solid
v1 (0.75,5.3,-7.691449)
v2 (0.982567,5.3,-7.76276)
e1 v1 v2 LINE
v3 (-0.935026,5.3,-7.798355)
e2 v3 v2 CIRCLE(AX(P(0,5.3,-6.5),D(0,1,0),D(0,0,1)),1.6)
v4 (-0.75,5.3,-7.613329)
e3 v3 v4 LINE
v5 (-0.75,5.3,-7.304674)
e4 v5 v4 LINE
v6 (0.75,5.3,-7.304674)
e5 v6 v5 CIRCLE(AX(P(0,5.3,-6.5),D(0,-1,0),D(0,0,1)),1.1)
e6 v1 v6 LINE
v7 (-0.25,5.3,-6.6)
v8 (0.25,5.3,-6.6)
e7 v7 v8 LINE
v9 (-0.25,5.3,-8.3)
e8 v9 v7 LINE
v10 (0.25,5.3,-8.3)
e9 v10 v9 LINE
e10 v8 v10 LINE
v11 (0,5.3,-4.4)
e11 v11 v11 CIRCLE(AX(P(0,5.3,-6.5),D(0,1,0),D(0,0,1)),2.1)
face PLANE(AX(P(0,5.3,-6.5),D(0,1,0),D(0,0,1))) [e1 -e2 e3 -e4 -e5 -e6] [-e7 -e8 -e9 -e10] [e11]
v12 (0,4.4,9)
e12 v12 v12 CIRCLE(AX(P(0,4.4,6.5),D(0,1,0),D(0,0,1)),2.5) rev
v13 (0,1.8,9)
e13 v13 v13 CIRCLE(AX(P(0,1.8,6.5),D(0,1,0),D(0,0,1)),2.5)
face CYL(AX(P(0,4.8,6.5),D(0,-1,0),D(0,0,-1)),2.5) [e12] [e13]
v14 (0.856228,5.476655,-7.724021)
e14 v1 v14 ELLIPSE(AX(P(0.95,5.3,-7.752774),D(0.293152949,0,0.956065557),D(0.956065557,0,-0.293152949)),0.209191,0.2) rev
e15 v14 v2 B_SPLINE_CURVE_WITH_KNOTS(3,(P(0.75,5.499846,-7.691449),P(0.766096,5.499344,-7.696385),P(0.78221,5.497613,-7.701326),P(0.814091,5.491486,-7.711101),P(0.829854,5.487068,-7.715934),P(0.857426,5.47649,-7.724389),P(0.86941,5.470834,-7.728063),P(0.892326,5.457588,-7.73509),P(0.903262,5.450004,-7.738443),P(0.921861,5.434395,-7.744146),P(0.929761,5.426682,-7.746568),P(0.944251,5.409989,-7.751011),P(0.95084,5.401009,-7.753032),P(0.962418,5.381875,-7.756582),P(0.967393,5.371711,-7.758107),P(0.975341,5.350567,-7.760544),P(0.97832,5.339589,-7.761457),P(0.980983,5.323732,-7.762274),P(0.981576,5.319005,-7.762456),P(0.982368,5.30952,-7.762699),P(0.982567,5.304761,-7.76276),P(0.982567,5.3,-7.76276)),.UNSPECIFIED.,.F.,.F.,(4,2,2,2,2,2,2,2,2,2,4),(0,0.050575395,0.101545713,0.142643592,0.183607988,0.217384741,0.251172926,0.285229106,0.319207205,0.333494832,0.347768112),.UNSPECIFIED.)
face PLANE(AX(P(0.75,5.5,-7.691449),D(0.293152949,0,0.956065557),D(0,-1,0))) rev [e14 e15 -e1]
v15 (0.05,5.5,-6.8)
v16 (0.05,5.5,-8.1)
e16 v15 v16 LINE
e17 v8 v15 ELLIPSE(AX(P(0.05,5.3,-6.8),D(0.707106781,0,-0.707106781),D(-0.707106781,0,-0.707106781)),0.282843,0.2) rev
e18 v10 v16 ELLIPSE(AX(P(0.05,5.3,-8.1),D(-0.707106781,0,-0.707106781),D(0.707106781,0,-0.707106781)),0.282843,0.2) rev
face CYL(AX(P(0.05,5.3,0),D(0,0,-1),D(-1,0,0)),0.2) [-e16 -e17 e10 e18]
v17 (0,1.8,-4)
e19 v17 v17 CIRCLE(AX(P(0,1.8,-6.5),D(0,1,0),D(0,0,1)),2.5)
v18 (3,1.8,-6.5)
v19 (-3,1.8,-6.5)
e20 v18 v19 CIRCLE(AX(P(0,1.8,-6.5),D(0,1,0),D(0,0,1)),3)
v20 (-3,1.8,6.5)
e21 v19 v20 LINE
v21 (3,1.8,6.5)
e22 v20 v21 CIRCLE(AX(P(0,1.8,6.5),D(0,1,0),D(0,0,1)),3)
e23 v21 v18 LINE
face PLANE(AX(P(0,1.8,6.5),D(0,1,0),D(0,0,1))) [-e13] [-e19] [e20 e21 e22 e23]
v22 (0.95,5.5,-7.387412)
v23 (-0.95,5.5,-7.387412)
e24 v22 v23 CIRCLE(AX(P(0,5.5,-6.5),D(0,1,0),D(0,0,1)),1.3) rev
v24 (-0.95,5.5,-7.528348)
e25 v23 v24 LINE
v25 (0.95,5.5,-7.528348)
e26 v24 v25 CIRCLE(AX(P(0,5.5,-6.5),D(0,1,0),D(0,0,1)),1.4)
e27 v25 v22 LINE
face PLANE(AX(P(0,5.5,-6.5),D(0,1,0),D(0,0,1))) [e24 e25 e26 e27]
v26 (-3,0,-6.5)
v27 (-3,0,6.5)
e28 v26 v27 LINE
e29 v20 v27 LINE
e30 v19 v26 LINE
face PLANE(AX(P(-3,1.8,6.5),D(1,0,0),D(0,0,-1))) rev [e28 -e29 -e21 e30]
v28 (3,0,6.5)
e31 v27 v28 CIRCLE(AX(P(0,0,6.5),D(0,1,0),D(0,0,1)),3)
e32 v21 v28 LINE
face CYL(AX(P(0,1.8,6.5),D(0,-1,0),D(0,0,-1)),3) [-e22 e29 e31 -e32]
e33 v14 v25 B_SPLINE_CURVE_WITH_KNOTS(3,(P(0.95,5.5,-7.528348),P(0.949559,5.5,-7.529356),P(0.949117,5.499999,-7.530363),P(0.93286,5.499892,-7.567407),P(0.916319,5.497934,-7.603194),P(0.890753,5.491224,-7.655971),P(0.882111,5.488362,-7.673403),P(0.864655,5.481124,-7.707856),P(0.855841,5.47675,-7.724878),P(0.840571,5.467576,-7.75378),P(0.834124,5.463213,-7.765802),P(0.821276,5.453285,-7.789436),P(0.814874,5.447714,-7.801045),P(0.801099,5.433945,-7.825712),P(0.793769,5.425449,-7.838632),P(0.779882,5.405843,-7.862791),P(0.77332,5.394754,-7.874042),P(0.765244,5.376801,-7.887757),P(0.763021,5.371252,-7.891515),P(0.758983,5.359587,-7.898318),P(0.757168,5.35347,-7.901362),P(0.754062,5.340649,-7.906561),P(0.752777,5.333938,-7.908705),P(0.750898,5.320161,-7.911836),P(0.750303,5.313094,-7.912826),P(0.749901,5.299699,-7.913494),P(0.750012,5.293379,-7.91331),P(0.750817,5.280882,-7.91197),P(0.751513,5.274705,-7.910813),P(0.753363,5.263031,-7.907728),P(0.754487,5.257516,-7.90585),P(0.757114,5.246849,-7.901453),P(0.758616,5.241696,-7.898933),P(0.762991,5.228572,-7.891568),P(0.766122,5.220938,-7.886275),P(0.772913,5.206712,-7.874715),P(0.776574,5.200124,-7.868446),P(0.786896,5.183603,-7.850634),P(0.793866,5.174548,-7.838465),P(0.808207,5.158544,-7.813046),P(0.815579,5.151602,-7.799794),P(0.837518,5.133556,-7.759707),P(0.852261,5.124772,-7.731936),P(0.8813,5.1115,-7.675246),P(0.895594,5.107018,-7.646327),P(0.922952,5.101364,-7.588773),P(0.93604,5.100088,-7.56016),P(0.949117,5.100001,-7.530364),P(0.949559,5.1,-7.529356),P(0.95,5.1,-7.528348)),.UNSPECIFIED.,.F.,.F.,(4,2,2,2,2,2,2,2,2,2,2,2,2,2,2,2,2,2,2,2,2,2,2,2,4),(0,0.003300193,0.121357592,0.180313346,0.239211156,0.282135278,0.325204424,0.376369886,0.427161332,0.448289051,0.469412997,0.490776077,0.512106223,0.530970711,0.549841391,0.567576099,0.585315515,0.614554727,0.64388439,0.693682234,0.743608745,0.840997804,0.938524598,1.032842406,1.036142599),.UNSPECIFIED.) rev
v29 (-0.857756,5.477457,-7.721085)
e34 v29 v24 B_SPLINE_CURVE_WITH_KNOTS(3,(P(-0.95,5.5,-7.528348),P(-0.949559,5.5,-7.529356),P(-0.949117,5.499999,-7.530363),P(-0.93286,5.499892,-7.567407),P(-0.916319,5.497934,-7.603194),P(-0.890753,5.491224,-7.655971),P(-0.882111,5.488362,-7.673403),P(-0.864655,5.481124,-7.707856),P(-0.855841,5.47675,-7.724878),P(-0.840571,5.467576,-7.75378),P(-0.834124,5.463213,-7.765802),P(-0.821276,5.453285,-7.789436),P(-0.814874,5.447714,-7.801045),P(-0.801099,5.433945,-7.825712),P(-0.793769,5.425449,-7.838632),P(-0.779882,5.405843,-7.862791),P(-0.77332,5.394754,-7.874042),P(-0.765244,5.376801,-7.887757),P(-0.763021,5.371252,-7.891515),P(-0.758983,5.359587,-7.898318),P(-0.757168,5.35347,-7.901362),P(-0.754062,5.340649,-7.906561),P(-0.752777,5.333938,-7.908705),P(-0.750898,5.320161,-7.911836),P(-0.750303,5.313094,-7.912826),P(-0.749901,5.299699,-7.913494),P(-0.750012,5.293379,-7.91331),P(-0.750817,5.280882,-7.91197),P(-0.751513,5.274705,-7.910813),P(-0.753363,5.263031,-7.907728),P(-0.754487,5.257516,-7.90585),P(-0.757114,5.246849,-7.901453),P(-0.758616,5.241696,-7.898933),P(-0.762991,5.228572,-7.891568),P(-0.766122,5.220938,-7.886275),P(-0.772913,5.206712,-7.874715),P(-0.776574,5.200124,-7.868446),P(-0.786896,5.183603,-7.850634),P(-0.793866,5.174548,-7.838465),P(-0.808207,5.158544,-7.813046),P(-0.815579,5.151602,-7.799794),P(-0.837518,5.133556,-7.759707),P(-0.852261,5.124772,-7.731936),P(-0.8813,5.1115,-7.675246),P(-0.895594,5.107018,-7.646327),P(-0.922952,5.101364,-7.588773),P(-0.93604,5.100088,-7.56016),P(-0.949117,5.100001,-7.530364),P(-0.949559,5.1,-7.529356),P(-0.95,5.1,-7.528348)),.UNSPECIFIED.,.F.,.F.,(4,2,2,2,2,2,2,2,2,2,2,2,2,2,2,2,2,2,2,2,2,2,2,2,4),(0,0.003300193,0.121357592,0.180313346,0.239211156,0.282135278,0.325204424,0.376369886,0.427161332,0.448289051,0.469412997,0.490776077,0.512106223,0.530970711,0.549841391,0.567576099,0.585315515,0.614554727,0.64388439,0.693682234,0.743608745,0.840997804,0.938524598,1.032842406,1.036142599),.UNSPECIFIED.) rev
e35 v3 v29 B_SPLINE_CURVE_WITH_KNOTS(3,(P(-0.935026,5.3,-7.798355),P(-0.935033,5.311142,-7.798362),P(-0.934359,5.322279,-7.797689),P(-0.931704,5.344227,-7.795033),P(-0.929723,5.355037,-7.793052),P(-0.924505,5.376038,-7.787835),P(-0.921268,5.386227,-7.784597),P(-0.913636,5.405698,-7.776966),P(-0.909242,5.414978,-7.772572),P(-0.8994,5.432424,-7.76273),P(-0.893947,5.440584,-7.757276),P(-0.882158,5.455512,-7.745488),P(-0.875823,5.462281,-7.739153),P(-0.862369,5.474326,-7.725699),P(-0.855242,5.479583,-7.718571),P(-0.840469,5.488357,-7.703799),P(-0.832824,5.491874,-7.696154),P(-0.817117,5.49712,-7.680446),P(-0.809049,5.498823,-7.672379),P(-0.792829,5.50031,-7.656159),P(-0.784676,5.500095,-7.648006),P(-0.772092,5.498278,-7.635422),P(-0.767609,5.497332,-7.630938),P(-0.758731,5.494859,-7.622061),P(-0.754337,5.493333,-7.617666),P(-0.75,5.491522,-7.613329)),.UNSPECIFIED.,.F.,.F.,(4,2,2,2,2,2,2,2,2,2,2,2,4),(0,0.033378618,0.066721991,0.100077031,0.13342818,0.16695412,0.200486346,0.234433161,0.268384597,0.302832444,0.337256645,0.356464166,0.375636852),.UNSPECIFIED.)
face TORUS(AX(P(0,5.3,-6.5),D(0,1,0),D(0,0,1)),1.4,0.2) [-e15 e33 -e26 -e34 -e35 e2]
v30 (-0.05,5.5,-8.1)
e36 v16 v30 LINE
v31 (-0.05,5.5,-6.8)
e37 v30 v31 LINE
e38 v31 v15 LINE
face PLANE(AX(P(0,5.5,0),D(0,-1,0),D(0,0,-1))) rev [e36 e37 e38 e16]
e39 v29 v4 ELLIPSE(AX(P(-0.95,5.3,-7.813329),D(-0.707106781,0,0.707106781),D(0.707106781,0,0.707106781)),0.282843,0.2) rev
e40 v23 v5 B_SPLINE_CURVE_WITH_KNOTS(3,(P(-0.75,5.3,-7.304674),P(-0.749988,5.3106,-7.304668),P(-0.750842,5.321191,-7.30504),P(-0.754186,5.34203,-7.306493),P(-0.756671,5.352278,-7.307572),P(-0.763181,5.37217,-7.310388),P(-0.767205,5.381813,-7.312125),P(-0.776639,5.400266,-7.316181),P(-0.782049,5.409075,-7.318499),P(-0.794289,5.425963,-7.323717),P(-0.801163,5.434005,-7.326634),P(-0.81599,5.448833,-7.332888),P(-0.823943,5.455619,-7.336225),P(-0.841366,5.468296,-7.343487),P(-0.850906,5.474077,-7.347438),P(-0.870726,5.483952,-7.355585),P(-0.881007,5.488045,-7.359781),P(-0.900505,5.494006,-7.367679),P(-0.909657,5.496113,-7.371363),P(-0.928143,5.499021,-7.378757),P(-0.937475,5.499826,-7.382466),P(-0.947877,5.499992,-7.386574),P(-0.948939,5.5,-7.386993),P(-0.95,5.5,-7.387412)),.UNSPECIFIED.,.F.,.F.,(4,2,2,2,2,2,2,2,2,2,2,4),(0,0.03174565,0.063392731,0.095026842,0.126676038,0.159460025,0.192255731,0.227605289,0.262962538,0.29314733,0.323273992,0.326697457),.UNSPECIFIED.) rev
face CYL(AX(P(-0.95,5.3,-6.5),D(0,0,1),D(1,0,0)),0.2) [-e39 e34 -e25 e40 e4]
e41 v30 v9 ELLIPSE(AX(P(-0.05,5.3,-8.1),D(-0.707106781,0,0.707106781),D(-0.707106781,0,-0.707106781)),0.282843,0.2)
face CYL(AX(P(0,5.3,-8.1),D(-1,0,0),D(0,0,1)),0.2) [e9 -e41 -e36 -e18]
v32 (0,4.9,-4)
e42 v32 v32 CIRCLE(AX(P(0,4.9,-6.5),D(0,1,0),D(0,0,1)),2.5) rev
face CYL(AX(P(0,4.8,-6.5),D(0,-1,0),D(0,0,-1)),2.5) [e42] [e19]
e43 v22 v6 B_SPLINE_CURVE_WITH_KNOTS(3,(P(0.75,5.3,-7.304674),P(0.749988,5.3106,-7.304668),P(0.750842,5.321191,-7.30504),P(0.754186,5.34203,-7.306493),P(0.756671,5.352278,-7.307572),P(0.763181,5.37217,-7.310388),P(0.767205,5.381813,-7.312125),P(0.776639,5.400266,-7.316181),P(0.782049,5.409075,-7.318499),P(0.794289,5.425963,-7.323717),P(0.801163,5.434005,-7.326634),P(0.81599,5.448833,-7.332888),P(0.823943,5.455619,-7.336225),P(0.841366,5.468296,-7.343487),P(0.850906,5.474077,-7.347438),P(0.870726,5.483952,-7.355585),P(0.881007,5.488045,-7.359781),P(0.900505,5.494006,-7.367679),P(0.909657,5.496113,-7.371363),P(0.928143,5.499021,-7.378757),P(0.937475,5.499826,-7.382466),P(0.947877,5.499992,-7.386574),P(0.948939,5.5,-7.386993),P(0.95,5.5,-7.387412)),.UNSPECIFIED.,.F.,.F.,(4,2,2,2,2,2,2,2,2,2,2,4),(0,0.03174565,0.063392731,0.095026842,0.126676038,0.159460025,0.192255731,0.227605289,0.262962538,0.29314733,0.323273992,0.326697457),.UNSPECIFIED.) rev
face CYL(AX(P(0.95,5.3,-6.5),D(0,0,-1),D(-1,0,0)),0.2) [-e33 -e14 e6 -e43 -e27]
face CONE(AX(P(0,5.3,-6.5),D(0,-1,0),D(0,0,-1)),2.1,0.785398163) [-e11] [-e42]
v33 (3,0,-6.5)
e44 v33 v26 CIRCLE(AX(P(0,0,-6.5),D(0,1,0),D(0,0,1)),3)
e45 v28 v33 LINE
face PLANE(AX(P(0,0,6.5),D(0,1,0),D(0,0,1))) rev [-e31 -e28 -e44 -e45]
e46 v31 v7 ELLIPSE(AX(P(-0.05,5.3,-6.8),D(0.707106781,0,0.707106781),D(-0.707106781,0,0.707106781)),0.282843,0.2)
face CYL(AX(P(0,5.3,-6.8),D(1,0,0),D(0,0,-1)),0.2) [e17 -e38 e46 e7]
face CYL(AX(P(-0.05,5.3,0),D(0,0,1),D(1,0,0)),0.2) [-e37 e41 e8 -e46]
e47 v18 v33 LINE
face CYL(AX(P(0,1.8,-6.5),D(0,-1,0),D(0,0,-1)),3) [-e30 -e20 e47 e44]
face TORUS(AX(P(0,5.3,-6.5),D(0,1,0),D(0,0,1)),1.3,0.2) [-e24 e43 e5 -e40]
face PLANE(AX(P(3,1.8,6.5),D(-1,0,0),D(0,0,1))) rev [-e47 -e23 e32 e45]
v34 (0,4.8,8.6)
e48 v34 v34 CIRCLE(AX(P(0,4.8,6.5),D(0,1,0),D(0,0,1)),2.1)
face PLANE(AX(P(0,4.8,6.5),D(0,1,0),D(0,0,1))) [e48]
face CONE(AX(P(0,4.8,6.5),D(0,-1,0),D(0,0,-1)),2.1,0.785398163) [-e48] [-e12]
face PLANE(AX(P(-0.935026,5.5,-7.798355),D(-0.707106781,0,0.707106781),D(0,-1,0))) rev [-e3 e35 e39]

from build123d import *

# Parameters (mm, degrees)
BOSS_EXTRUDE1_DEPTH = 1.8
SKETCH2_R           = 2.500000000000001
BOSS_EXTRUDE2_DEPTH = 3
SKETCH3_R           = 2.5000000000000013
BOSS_EXTRUDE3_DEPTH = 0.5
CHAMFER1_SIZE       = 0.4
SKETCH4_W           = 0.5
SKETCH4_H           = 1.7000000000000002
BOSS_EXTRUDE4_DEPTH = 0.2
CHAMFER2_SIZE       = 0.3
CHAMFER2_SIZE_2     = 0.221880218
FILLET1_R           = 0.2


with BuildPart() as part:
    # Sketch1 → Boss-Extrude1 (new body)
    with BuildSketch(Plane(origin=(0, 0, 0), x_dir=(1, 0, 0), z_dir=(0, 1, 0))):
        with BuildLine():
            Line((-3, -6.5), (-3.0000000000000027, 6.499999999999998))
            ThreePointArc((-3.0000000000000027, 6.499999999999998), (-4.2e-15, 9.5), (2.9999999999999973, 6.500000000000002))
            Line((2.9999999999999973, 6.500000000000002), (3, -6.5))
            ThreePointArc((3, -6.5), (-5.5e-16, -9.5), (-3, -6.5))
        make_face()
    extrude(amount=BOSS_EXTRUDE1_DEPTH)

    # Sketch2 → Boss-Extrude2 (add)
    with BuildSketch(Plane(origin=(0, 1.8, 0), x_dir=(1, 0, 0), z_dir=(0, 1, 0))):
        with Locations(Location((-2.39e-15, 6.5, 0), (0, 0, 270))):
            Circle(SKETCH2_R)
        with Locations(Location((0, -6.5, 0), (0, 0, 270))):
            Circle(SKETCH2_R)
    extrude(amount=BOSS_EXTRUDE2_DEPTH)

    # Sketch3 → Boss-Extrude3 (add)
    with BuildSketch(Plane(origin=(0, 4.800000000000001, 0), x_dir=(1, 0, 0), z_dir=(0, 1, 0))):
        with Locations(Location((-2.39e-15, 6.5, 0), (0, 0, 270))):
            Circle(SKETCH3_R)
    extrude(amount=BOSS_EXTRUDE3_DEPTH)

    # Chamfer1
    chamfer1_edges = [part.edges().sort_by_distance(p)[0] for p in [
        (7.7e-16, 4.8, 3.999999999999999),
        (-1.62e-15, 5.300000000000001, -9.000000000000002),
    ]]
    chamfer(chamfer1_edges, length=CHAMFER1_SIZE)

    # Sketch4 → Boss-Extrude4 (add)
    with BuildSketch(Plane(origin=(0, 5.300000000000001, 0), x_dir=(1, 0, 0), z_dir=(0, 1, 0))):
        with BuildLine():
            Line((-0.75, 7.913329402510258), (-0.75, 7.304673846971556))
            ThreePointArc((-0.75, 7.304673846971556), (-4.54e-15, 5.4), (0.75, 7.304673846971556))
            Line((0.75, 7.304673846971556), (0.75, 7.913329402510258))
            ThreePointArc((0.75, 7.913329402510258), (-5.52e-15, 4.9), (-0.75, 7.913329402510258))
        make_face()
        with Locations((-2.76e-15, 7.449999999999999)):
            Rectangle(SKETCH4_W, SKETCH4_H)
    extrude(amount=BOSS_EXTRUDE4_DEPTH)

    # Chamfer2
    # the kernel refuses this chamfer: 0.3, 0.221880218 mm, written as the material it takes off along each edge
    with BuildSketch(Plane(origin=(-0.75, 5.300000000000001, -7.913329402510258), x_dir=(0, 0, 1), z_dir=(0, 1, 0))) as chamfer2_piece_1:
        with BuildLine():
            Line((CHAMFER2_SIZE, 0), (0.11497408326020686, -0.18502591673979885))
            ThreePointArc((0.11497408326020686, -0.18502591673979885), (0.05505412011014688, -0.09562891224277614), (0, 0))
            Line((0, 0), (CHAMFER2_SIZE, 0))
        make_face()
    extrude(amount=0.9715048963897726, mode=Mode.SUBTRACT)
    with BuildSketch(Plane(origin=(0.75, 5.300000000000001, -7.913329402510258), x_dir=(0.8394299671515956, 0, 0.5434678741635711), z_dir=(0, 1, 0))) as chamfer2_piece_2:
        with BuildLine():
            Line((0.27705330102285075, 2e-17), (CHAMFER2_SIZE_2 * 0.543467874804, -CHAMFER2_SIZE_2 * 0.83942996814))
            Line((CHAMFER2_SIZE_2 * 0.543467874804, -CHAMFER2_SIZE_2 * 0.83942996814), (0, 0))
            ThreePointArc((0, 0), (0.14238943823073183, 0.00600337759415658), (0.27705330102285075, 2e-17))
        make_face()
    extrude(amount=0.9123006442989672, mode=Mode.SUBTRACT)

    # Fillet1
    # the kernel refuses this fillet: 0.2 mm, written as the material it takes off along each edge
    with BuildSketch(Plane(origin=(-0.7500000000000032, 5.500000000000001, -6.599999999999999), x_dir=(0, -1, 0), z_dir=(1, 0, 0))) as fillet1_piece_1:
        with BuildLine():
            CenterArc((FILLET1_R, FILLET1_R), FILLET1_R, 180, 90)
            Line((0, FILLET1_R), (0, 0))
            Line((0, 0), (FILLET1_R, 0))
        make_face()
    extrude(amount=1.5000000000000009, mode=Mode.SUBTRACT)
    with BuildSketch(Plane(origin=(-0.2500000000000028, 5.500000000000001, -8.799999999999999), x_dir=(0, -1, 0), z_dir=(0, 0, 1)), Plane(origin=(0.24999999999999725, 5.500000000000001, -6.099999999999998), x_dir=(0, -1, 0), z_dir=(0, 0, -1))) as fillet1_piece_2:
        with BuildLine():
            CenterArc((FILLET1_R, FILLET1_R), FILLET1_R, 180, 90)
            Line((0, FILLET1_R), (0, 0))
            Line((0, 0), (FILLET1_R, 0))
        make_face()
    extrude(amount=2.700000000000001, mode=Mode.SUBTRACT)
    with BuildSketch(Plane(origin=(0.7499999999999977, 5.500000000000001, -8.299999999999999), x_dir=(0, -1, 0), z_dir=(-1, 0, 0))) as fillet1_piece_3:
        with BuildLine():
            CenterArc((FILLET1_R, FILLET1_R), FILLET1_R, 180, 90)
            Line((0, FILLET1_R), (0, 0))
            Line((0, 0), (FILLET1_R, 0))
        make_face()
    extrude(amount=1.5000000000000009, mode=Mode.SUBTRACT)
    with BuildSketch(Plane(origin=(-0.75, 5.500000000000001, -8.11332940251), x_dir=(0, -1, 0), z_dir=(0, 0, 1))) as fillet1_piece_4:
        with BuildLine():
            CenterArc((FILLET1_R, -FILLET1_R), FILLET1_R, 90, 90)
            Line((0, -FILLET1_R), (0, 0))
            Line((0, 0), (FILLET1_R, 0))
        make_face()
    extrude(amount=1.3086555555384454, mode=Mode.SUBTRACT)
    with BuildSketch(Plane(origin=(-8e-17, 5.500000000000001, -6.500000000000001), x_dir=(-0.2897858618854929, 0, -0.9570915077730457), z_dir=(0.9570915077730457, 0, -0.2897858618854929))) as fillet1_piece_5:
        with BuildLine():
            CenterArc((1.1000000000000005 + FILLET1_R, -FILLET1_R), FILLET1_R, 90.00000000000006, 89.99999999999994)
            Line((1.1000000000000005 + FILLET1_R, 0), (1.1000000000000005, 0))
            Line((1.1000000000000005, 0), (1.1000000000000005, -FILLET1_R))
        make_face()
    revolve(axis=Axis((-8e-17, 5.500000000000001, -6.500000000000001), (0, 1, 0)), revolution_arc=326.3097273547943, mode=Mode.SUBTRACT)
    with BuildSketch(Plane(origin=(0.75, 5.500000000000001, -6.804673846971555), x_dir=(0, -1, 0), z_dir=(0, 0, -1))) as fillet1_piece_6:
        with BuildLine():
            CenterArc((FILLET1_R, -FILLET1_R), FILLET1_R, 90, 90)
            Line((0, -FILLET1_R), (0, 0))
            Line((0, 0), (FILLET1_R, 0))
        make_face()
    extrude(amount=1.3867753372771254, mode=Mode.SUBTRACT)
    with BuildSketch(Plane(origin=(8e-17, 5.500000000000001, -6.500000000000001), x_dir=(0.3405261643731297, 0, -0.9402350404964305), z_dir=(-0.9402350404964305, 0, -0.3405261643731297))) as fillet1_piece_7:
        with BuildLine():
            CenterArc((1.5999999999999999 - FILLET1_R, FILLET1_R), FILLET1_R, 270, 90)
            Line((1.5999999999999999 - FILLET1_R, 0), (1.5999999999999999, 0))
            Line((1.5999999999999999, 0), (1.5999999999999999, FILLET1_R))
        make_face()
    revolve(axis=Axis((8e-17, 5.500000000000001, -6.500000000000001), (0, -1, 0)), revolution_arc=322.309003529889, mode=Mode.SUBTRACT)


solid = part.part
